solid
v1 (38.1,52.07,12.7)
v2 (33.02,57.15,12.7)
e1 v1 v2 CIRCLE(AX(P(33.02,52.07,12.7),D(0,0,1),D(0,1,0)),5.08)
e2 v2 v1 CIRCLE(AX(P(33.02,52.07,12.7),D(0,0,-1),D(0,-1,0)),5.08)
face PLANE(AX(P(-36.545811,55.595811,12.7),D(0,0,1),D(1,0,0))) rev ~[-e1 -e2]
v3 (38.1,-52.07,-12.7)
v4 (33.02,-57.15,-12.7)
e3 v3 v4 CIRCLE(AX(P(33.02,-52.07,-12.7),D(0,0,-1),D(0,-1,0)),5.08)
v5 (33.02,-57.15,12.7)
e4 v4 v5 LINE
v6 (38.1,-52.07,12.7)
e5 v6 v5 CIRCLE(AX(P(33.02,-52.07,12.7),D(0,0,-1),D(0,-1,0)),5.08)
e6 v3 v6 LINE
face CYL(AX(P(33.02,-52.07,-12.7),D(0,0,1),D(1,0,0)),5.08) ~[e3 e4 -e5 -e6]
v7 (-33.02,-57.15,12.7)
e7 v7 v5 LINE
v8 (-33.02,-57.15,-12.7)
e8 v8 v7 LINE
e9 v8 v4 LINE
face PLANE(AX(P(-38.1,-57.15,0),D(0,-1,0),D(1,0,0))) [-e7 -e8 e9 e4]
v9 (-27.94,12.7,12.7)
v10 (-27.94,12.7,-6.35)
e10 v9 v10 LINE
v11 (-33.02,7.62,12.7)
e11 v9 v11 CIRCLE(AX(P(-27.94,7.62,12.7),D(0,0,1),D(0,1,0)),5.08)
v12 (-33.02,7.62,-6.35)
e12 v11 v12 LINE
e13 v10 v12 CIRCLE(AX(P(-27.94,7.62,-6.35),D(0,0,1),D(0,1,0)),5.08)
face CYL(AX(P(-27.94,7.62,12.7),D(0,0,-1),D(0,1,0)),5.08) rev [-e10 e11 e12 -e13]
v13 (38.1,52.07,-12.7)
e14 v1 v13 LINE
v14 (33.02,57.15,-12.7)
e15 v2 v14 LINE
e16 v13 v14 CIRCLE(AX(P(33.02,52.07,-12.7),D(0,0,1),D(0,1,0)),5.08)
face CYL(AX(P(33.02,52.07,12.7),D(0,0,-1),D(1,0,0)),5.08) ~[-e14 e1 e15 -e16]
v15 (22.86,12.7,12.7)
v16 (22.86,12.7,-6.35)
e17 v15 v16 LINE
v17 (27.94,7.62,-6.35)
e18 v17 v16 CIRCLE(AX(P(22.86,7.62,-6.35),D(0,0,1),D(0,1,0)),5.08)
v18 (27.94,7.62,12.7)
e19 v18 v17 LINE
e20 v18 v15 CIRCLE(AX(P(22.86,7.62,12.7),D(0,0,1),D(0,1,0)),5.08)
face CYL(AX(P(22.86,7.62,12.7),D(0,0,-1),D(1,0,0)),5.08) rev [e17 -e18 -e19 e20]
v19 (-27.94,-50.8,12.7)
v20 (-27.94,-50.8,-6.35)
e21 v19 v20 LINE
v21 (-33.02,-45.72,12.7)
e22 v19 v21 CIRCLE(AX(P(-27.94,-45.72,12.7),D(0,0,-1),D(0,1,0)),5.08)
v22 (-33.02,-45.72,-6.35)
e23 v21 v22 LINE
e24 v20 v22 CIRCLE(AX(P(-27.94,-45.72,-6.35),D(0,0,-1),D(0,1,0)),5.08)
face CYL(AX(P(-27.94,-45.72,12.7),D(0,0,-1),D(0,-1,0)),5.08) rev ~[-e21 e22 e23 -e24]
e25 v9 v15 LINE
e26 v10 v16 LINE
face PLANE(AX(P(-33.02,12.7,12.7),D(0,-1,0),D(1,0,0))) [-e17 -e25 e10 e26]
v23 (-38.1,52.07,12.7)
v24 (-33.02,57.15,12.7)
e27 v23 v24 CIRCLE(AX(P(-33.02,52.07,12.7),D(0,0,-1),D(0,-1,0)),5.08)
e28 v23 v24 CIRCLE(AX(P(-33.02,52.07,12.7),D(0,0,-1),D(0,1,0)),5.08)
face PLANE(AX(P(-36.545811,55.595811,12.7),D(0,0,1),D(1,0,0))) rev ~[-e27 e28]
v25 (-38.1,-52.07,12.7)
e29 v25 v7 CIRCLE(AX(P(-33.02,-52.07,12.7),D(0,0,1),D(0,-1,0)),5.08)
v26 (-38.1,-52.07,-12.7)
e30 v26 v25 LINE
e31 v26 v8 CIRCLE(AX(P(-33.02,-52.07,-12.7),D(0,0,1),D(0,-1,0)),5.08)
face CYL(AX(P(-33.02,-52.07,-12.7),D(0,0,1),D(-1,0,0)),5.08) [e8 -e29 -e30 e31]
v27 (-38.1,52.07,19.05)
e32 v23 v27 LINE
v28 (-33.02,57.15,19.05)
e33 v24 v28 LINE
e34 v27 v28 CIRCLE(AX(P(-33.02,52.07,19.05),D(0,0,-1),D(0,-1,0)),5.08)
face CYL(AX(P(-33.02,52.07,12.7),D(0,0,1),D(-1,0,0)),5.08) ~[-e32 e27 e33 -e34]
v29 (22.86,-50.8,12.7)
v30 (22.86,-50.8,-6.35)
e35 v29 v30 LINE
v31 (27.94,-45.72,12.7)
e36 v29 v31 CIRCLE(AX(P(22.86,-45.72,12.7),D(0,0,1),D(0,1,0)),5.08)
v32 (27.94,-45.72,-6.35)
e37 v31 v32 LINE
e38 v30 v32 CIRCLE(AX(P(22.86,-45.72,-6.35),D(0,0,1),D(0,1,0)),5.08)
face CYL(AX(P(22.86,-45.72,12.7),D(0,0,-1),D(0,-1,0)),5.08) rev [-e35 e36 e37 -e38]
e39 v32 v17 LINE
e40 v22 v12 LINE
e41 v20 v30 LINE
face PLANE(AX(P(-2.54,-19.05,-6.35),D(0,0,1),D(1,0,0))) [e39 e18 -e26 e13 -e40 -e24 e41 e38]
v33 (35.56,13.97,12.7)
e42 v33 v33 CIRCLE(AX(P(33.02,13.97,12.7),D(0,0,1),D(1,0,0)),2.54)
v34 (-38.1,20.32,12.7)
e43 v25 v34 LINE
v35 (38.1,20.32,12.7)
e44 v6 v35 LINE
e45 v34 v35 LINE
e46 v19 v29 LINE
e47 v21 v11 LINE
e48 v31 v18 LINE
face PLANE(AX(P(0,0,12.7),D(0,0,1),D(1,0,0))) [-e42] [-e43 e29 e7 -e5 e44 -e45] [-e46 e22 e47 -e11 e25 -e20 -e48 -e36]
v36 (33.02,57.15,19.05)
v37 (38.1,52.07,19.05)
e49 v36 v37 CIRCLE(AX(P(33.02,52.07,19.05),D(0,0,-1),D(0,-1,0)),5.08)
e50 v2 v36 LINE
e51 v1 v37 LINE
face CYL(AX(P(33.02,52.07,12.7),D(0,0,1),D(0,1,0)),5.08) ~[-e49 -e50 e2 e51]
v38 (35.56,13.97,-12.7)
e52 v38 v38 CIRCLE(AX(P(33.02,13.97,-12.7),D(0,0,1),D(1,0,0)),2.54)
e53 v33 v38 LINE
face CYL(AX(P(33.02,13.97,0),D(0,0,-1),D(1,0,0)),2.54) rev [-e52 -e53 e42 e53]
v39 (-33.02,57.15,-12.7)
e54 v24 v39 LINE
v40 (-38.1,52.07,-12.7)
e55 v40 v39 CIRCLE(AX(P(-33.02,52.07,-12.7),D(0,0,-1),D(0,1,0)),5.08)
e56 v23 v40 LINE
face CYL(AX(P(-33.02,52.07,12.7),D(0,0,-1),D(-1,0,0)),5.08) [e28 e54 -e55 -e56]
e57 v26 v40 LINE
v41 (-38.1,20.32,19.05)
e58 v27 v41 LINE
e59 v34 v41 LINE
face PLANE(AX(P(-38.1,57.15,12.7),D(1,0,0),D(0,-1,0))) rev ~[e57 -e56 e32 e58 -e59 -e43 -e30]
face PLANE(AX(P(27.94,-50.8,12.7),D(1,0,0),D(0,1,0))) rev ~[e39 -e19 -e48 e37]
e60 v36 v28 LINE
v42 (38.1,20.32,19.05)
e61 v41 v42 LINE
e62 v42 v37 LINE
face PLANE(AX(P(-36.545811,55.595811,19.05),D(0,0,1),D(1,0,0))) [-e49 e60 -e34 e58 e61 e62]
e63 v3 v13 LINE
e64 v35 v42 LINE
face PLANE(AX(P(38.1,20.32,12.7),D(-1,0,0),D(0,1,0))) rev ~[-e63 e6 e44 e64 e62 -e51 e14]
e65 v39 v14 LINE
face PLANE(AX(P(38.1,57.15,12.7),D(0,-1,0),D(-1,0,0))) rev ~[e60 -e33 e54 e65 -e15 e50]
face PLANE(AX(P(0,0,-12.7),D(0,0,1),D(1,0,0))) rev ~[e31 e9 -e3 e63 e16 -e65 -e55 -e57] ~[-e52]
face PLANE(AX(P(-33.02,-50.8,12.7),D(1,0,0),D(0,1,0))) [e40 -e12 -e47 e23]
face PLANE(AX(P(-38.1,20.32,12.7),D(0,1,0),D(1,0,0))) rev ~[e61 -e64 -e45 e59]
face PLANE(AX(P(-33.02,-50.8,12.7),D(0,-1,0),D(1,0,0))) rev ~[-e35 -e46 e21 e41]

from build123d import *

# Parameters (mm, degrees)
F0_W     = 76.2
F0_H     = 114.3
F0_R     = 2.54
F1_DEPTH = 12.7
F2_R     = 5.08
F4_DEPTH = 6.35
F5_W     = 60.96
F5_H     = 63.5
F6_DEPTH = 19.05
F7_R     = 5.08


with BuildPart() as f1:
    # F0 (on Top) → F1 (new body, symmetric)
    with BuildSketch(Plane.XY):
        Rectangle(F0_W, F0_H)
        with Locations((33.02, 13.97)):
            Circle(F0_R, mode=Mode.SUBTRACT)
    extrude(amount=F1_DEPTH, both=True)

    # F2
    f2_edges = [f1.edges().sort_by_distance(p)[0] for p in [
        (-38.1, -57.15, 0),
        (38.1, -57.15, 0),
        (-38.1, 57.15, 0),
        (38.1, 57.15, 0),
    ]]
    fillet(f2_edges, radius=F2_R)

    # F3 (on face) → F4 (join)
    with BuildSketch(Plane.XY.offset(12.7)):
        with BuildLine():
            Line((-33.02, 57.15), (-38.1, 57.15))
            Line((-38.1, 57.15), (-38.1, 52.07))
            ThreePointArc((-38.1, 52.07), (-36.6121024484, 55.6621024484), (-33.02, 57.15))
        make_face()
        with BuildLine():
            Line((33.02, 57.15), (-33.02, 57.15))
            ThreePointArc((-33.02, 57.15), (-36.6121024484, 55.6621024484), (-38.1, 52.07))
            Line((-38.1, 52.07), (-38.1, 20.32))
            Line((-38.1, 20.32), (38.1, 20.32))
            Line((38.1, 20.32), (38.1, 52.07))
            ThreePointArc((38.1, 52.07), (36.6121024484, 55.6621024484), (33.02, 57.15))
        make_face()
        with BuildLine():
            Line((38.1, 57.15), (33.02, 57.15))
            ThreePointArc((33.02, 57.15), (36.6121024484, 55.6621024484), (38.1, 52.07))
            Line((38.1, 52.07), (38.1, 57.15))
        make_face()
    extrude(amount=F4_DEPTH)

    # F5 (on face) → F6 (cut)
    with BuildSketch(Plane.XY.offset(12.7)):
        with Locations((-2.54, -19.05)):
            Rectangle(F5_W, F5_H)
    extrude(amount=-F6_DEPTH, mode=Mode.SUBTRACT)

    # F7
    f7_edges = [f1.edges().sort_by_distance(p)[0] for p in [
        (-33.02, 12.7, 3.175),
        (-33.02, -50.8, 3.175),
        (27.94, 12.7, 3.175),
        (27.94, -50.8, 3.175),
        (-38.1, 57.15, 15.875),
        (38.1, 57.15, 15.875),
    ]]
    fillet(f7_edges, radius=F7_R)


solid = f1.part
